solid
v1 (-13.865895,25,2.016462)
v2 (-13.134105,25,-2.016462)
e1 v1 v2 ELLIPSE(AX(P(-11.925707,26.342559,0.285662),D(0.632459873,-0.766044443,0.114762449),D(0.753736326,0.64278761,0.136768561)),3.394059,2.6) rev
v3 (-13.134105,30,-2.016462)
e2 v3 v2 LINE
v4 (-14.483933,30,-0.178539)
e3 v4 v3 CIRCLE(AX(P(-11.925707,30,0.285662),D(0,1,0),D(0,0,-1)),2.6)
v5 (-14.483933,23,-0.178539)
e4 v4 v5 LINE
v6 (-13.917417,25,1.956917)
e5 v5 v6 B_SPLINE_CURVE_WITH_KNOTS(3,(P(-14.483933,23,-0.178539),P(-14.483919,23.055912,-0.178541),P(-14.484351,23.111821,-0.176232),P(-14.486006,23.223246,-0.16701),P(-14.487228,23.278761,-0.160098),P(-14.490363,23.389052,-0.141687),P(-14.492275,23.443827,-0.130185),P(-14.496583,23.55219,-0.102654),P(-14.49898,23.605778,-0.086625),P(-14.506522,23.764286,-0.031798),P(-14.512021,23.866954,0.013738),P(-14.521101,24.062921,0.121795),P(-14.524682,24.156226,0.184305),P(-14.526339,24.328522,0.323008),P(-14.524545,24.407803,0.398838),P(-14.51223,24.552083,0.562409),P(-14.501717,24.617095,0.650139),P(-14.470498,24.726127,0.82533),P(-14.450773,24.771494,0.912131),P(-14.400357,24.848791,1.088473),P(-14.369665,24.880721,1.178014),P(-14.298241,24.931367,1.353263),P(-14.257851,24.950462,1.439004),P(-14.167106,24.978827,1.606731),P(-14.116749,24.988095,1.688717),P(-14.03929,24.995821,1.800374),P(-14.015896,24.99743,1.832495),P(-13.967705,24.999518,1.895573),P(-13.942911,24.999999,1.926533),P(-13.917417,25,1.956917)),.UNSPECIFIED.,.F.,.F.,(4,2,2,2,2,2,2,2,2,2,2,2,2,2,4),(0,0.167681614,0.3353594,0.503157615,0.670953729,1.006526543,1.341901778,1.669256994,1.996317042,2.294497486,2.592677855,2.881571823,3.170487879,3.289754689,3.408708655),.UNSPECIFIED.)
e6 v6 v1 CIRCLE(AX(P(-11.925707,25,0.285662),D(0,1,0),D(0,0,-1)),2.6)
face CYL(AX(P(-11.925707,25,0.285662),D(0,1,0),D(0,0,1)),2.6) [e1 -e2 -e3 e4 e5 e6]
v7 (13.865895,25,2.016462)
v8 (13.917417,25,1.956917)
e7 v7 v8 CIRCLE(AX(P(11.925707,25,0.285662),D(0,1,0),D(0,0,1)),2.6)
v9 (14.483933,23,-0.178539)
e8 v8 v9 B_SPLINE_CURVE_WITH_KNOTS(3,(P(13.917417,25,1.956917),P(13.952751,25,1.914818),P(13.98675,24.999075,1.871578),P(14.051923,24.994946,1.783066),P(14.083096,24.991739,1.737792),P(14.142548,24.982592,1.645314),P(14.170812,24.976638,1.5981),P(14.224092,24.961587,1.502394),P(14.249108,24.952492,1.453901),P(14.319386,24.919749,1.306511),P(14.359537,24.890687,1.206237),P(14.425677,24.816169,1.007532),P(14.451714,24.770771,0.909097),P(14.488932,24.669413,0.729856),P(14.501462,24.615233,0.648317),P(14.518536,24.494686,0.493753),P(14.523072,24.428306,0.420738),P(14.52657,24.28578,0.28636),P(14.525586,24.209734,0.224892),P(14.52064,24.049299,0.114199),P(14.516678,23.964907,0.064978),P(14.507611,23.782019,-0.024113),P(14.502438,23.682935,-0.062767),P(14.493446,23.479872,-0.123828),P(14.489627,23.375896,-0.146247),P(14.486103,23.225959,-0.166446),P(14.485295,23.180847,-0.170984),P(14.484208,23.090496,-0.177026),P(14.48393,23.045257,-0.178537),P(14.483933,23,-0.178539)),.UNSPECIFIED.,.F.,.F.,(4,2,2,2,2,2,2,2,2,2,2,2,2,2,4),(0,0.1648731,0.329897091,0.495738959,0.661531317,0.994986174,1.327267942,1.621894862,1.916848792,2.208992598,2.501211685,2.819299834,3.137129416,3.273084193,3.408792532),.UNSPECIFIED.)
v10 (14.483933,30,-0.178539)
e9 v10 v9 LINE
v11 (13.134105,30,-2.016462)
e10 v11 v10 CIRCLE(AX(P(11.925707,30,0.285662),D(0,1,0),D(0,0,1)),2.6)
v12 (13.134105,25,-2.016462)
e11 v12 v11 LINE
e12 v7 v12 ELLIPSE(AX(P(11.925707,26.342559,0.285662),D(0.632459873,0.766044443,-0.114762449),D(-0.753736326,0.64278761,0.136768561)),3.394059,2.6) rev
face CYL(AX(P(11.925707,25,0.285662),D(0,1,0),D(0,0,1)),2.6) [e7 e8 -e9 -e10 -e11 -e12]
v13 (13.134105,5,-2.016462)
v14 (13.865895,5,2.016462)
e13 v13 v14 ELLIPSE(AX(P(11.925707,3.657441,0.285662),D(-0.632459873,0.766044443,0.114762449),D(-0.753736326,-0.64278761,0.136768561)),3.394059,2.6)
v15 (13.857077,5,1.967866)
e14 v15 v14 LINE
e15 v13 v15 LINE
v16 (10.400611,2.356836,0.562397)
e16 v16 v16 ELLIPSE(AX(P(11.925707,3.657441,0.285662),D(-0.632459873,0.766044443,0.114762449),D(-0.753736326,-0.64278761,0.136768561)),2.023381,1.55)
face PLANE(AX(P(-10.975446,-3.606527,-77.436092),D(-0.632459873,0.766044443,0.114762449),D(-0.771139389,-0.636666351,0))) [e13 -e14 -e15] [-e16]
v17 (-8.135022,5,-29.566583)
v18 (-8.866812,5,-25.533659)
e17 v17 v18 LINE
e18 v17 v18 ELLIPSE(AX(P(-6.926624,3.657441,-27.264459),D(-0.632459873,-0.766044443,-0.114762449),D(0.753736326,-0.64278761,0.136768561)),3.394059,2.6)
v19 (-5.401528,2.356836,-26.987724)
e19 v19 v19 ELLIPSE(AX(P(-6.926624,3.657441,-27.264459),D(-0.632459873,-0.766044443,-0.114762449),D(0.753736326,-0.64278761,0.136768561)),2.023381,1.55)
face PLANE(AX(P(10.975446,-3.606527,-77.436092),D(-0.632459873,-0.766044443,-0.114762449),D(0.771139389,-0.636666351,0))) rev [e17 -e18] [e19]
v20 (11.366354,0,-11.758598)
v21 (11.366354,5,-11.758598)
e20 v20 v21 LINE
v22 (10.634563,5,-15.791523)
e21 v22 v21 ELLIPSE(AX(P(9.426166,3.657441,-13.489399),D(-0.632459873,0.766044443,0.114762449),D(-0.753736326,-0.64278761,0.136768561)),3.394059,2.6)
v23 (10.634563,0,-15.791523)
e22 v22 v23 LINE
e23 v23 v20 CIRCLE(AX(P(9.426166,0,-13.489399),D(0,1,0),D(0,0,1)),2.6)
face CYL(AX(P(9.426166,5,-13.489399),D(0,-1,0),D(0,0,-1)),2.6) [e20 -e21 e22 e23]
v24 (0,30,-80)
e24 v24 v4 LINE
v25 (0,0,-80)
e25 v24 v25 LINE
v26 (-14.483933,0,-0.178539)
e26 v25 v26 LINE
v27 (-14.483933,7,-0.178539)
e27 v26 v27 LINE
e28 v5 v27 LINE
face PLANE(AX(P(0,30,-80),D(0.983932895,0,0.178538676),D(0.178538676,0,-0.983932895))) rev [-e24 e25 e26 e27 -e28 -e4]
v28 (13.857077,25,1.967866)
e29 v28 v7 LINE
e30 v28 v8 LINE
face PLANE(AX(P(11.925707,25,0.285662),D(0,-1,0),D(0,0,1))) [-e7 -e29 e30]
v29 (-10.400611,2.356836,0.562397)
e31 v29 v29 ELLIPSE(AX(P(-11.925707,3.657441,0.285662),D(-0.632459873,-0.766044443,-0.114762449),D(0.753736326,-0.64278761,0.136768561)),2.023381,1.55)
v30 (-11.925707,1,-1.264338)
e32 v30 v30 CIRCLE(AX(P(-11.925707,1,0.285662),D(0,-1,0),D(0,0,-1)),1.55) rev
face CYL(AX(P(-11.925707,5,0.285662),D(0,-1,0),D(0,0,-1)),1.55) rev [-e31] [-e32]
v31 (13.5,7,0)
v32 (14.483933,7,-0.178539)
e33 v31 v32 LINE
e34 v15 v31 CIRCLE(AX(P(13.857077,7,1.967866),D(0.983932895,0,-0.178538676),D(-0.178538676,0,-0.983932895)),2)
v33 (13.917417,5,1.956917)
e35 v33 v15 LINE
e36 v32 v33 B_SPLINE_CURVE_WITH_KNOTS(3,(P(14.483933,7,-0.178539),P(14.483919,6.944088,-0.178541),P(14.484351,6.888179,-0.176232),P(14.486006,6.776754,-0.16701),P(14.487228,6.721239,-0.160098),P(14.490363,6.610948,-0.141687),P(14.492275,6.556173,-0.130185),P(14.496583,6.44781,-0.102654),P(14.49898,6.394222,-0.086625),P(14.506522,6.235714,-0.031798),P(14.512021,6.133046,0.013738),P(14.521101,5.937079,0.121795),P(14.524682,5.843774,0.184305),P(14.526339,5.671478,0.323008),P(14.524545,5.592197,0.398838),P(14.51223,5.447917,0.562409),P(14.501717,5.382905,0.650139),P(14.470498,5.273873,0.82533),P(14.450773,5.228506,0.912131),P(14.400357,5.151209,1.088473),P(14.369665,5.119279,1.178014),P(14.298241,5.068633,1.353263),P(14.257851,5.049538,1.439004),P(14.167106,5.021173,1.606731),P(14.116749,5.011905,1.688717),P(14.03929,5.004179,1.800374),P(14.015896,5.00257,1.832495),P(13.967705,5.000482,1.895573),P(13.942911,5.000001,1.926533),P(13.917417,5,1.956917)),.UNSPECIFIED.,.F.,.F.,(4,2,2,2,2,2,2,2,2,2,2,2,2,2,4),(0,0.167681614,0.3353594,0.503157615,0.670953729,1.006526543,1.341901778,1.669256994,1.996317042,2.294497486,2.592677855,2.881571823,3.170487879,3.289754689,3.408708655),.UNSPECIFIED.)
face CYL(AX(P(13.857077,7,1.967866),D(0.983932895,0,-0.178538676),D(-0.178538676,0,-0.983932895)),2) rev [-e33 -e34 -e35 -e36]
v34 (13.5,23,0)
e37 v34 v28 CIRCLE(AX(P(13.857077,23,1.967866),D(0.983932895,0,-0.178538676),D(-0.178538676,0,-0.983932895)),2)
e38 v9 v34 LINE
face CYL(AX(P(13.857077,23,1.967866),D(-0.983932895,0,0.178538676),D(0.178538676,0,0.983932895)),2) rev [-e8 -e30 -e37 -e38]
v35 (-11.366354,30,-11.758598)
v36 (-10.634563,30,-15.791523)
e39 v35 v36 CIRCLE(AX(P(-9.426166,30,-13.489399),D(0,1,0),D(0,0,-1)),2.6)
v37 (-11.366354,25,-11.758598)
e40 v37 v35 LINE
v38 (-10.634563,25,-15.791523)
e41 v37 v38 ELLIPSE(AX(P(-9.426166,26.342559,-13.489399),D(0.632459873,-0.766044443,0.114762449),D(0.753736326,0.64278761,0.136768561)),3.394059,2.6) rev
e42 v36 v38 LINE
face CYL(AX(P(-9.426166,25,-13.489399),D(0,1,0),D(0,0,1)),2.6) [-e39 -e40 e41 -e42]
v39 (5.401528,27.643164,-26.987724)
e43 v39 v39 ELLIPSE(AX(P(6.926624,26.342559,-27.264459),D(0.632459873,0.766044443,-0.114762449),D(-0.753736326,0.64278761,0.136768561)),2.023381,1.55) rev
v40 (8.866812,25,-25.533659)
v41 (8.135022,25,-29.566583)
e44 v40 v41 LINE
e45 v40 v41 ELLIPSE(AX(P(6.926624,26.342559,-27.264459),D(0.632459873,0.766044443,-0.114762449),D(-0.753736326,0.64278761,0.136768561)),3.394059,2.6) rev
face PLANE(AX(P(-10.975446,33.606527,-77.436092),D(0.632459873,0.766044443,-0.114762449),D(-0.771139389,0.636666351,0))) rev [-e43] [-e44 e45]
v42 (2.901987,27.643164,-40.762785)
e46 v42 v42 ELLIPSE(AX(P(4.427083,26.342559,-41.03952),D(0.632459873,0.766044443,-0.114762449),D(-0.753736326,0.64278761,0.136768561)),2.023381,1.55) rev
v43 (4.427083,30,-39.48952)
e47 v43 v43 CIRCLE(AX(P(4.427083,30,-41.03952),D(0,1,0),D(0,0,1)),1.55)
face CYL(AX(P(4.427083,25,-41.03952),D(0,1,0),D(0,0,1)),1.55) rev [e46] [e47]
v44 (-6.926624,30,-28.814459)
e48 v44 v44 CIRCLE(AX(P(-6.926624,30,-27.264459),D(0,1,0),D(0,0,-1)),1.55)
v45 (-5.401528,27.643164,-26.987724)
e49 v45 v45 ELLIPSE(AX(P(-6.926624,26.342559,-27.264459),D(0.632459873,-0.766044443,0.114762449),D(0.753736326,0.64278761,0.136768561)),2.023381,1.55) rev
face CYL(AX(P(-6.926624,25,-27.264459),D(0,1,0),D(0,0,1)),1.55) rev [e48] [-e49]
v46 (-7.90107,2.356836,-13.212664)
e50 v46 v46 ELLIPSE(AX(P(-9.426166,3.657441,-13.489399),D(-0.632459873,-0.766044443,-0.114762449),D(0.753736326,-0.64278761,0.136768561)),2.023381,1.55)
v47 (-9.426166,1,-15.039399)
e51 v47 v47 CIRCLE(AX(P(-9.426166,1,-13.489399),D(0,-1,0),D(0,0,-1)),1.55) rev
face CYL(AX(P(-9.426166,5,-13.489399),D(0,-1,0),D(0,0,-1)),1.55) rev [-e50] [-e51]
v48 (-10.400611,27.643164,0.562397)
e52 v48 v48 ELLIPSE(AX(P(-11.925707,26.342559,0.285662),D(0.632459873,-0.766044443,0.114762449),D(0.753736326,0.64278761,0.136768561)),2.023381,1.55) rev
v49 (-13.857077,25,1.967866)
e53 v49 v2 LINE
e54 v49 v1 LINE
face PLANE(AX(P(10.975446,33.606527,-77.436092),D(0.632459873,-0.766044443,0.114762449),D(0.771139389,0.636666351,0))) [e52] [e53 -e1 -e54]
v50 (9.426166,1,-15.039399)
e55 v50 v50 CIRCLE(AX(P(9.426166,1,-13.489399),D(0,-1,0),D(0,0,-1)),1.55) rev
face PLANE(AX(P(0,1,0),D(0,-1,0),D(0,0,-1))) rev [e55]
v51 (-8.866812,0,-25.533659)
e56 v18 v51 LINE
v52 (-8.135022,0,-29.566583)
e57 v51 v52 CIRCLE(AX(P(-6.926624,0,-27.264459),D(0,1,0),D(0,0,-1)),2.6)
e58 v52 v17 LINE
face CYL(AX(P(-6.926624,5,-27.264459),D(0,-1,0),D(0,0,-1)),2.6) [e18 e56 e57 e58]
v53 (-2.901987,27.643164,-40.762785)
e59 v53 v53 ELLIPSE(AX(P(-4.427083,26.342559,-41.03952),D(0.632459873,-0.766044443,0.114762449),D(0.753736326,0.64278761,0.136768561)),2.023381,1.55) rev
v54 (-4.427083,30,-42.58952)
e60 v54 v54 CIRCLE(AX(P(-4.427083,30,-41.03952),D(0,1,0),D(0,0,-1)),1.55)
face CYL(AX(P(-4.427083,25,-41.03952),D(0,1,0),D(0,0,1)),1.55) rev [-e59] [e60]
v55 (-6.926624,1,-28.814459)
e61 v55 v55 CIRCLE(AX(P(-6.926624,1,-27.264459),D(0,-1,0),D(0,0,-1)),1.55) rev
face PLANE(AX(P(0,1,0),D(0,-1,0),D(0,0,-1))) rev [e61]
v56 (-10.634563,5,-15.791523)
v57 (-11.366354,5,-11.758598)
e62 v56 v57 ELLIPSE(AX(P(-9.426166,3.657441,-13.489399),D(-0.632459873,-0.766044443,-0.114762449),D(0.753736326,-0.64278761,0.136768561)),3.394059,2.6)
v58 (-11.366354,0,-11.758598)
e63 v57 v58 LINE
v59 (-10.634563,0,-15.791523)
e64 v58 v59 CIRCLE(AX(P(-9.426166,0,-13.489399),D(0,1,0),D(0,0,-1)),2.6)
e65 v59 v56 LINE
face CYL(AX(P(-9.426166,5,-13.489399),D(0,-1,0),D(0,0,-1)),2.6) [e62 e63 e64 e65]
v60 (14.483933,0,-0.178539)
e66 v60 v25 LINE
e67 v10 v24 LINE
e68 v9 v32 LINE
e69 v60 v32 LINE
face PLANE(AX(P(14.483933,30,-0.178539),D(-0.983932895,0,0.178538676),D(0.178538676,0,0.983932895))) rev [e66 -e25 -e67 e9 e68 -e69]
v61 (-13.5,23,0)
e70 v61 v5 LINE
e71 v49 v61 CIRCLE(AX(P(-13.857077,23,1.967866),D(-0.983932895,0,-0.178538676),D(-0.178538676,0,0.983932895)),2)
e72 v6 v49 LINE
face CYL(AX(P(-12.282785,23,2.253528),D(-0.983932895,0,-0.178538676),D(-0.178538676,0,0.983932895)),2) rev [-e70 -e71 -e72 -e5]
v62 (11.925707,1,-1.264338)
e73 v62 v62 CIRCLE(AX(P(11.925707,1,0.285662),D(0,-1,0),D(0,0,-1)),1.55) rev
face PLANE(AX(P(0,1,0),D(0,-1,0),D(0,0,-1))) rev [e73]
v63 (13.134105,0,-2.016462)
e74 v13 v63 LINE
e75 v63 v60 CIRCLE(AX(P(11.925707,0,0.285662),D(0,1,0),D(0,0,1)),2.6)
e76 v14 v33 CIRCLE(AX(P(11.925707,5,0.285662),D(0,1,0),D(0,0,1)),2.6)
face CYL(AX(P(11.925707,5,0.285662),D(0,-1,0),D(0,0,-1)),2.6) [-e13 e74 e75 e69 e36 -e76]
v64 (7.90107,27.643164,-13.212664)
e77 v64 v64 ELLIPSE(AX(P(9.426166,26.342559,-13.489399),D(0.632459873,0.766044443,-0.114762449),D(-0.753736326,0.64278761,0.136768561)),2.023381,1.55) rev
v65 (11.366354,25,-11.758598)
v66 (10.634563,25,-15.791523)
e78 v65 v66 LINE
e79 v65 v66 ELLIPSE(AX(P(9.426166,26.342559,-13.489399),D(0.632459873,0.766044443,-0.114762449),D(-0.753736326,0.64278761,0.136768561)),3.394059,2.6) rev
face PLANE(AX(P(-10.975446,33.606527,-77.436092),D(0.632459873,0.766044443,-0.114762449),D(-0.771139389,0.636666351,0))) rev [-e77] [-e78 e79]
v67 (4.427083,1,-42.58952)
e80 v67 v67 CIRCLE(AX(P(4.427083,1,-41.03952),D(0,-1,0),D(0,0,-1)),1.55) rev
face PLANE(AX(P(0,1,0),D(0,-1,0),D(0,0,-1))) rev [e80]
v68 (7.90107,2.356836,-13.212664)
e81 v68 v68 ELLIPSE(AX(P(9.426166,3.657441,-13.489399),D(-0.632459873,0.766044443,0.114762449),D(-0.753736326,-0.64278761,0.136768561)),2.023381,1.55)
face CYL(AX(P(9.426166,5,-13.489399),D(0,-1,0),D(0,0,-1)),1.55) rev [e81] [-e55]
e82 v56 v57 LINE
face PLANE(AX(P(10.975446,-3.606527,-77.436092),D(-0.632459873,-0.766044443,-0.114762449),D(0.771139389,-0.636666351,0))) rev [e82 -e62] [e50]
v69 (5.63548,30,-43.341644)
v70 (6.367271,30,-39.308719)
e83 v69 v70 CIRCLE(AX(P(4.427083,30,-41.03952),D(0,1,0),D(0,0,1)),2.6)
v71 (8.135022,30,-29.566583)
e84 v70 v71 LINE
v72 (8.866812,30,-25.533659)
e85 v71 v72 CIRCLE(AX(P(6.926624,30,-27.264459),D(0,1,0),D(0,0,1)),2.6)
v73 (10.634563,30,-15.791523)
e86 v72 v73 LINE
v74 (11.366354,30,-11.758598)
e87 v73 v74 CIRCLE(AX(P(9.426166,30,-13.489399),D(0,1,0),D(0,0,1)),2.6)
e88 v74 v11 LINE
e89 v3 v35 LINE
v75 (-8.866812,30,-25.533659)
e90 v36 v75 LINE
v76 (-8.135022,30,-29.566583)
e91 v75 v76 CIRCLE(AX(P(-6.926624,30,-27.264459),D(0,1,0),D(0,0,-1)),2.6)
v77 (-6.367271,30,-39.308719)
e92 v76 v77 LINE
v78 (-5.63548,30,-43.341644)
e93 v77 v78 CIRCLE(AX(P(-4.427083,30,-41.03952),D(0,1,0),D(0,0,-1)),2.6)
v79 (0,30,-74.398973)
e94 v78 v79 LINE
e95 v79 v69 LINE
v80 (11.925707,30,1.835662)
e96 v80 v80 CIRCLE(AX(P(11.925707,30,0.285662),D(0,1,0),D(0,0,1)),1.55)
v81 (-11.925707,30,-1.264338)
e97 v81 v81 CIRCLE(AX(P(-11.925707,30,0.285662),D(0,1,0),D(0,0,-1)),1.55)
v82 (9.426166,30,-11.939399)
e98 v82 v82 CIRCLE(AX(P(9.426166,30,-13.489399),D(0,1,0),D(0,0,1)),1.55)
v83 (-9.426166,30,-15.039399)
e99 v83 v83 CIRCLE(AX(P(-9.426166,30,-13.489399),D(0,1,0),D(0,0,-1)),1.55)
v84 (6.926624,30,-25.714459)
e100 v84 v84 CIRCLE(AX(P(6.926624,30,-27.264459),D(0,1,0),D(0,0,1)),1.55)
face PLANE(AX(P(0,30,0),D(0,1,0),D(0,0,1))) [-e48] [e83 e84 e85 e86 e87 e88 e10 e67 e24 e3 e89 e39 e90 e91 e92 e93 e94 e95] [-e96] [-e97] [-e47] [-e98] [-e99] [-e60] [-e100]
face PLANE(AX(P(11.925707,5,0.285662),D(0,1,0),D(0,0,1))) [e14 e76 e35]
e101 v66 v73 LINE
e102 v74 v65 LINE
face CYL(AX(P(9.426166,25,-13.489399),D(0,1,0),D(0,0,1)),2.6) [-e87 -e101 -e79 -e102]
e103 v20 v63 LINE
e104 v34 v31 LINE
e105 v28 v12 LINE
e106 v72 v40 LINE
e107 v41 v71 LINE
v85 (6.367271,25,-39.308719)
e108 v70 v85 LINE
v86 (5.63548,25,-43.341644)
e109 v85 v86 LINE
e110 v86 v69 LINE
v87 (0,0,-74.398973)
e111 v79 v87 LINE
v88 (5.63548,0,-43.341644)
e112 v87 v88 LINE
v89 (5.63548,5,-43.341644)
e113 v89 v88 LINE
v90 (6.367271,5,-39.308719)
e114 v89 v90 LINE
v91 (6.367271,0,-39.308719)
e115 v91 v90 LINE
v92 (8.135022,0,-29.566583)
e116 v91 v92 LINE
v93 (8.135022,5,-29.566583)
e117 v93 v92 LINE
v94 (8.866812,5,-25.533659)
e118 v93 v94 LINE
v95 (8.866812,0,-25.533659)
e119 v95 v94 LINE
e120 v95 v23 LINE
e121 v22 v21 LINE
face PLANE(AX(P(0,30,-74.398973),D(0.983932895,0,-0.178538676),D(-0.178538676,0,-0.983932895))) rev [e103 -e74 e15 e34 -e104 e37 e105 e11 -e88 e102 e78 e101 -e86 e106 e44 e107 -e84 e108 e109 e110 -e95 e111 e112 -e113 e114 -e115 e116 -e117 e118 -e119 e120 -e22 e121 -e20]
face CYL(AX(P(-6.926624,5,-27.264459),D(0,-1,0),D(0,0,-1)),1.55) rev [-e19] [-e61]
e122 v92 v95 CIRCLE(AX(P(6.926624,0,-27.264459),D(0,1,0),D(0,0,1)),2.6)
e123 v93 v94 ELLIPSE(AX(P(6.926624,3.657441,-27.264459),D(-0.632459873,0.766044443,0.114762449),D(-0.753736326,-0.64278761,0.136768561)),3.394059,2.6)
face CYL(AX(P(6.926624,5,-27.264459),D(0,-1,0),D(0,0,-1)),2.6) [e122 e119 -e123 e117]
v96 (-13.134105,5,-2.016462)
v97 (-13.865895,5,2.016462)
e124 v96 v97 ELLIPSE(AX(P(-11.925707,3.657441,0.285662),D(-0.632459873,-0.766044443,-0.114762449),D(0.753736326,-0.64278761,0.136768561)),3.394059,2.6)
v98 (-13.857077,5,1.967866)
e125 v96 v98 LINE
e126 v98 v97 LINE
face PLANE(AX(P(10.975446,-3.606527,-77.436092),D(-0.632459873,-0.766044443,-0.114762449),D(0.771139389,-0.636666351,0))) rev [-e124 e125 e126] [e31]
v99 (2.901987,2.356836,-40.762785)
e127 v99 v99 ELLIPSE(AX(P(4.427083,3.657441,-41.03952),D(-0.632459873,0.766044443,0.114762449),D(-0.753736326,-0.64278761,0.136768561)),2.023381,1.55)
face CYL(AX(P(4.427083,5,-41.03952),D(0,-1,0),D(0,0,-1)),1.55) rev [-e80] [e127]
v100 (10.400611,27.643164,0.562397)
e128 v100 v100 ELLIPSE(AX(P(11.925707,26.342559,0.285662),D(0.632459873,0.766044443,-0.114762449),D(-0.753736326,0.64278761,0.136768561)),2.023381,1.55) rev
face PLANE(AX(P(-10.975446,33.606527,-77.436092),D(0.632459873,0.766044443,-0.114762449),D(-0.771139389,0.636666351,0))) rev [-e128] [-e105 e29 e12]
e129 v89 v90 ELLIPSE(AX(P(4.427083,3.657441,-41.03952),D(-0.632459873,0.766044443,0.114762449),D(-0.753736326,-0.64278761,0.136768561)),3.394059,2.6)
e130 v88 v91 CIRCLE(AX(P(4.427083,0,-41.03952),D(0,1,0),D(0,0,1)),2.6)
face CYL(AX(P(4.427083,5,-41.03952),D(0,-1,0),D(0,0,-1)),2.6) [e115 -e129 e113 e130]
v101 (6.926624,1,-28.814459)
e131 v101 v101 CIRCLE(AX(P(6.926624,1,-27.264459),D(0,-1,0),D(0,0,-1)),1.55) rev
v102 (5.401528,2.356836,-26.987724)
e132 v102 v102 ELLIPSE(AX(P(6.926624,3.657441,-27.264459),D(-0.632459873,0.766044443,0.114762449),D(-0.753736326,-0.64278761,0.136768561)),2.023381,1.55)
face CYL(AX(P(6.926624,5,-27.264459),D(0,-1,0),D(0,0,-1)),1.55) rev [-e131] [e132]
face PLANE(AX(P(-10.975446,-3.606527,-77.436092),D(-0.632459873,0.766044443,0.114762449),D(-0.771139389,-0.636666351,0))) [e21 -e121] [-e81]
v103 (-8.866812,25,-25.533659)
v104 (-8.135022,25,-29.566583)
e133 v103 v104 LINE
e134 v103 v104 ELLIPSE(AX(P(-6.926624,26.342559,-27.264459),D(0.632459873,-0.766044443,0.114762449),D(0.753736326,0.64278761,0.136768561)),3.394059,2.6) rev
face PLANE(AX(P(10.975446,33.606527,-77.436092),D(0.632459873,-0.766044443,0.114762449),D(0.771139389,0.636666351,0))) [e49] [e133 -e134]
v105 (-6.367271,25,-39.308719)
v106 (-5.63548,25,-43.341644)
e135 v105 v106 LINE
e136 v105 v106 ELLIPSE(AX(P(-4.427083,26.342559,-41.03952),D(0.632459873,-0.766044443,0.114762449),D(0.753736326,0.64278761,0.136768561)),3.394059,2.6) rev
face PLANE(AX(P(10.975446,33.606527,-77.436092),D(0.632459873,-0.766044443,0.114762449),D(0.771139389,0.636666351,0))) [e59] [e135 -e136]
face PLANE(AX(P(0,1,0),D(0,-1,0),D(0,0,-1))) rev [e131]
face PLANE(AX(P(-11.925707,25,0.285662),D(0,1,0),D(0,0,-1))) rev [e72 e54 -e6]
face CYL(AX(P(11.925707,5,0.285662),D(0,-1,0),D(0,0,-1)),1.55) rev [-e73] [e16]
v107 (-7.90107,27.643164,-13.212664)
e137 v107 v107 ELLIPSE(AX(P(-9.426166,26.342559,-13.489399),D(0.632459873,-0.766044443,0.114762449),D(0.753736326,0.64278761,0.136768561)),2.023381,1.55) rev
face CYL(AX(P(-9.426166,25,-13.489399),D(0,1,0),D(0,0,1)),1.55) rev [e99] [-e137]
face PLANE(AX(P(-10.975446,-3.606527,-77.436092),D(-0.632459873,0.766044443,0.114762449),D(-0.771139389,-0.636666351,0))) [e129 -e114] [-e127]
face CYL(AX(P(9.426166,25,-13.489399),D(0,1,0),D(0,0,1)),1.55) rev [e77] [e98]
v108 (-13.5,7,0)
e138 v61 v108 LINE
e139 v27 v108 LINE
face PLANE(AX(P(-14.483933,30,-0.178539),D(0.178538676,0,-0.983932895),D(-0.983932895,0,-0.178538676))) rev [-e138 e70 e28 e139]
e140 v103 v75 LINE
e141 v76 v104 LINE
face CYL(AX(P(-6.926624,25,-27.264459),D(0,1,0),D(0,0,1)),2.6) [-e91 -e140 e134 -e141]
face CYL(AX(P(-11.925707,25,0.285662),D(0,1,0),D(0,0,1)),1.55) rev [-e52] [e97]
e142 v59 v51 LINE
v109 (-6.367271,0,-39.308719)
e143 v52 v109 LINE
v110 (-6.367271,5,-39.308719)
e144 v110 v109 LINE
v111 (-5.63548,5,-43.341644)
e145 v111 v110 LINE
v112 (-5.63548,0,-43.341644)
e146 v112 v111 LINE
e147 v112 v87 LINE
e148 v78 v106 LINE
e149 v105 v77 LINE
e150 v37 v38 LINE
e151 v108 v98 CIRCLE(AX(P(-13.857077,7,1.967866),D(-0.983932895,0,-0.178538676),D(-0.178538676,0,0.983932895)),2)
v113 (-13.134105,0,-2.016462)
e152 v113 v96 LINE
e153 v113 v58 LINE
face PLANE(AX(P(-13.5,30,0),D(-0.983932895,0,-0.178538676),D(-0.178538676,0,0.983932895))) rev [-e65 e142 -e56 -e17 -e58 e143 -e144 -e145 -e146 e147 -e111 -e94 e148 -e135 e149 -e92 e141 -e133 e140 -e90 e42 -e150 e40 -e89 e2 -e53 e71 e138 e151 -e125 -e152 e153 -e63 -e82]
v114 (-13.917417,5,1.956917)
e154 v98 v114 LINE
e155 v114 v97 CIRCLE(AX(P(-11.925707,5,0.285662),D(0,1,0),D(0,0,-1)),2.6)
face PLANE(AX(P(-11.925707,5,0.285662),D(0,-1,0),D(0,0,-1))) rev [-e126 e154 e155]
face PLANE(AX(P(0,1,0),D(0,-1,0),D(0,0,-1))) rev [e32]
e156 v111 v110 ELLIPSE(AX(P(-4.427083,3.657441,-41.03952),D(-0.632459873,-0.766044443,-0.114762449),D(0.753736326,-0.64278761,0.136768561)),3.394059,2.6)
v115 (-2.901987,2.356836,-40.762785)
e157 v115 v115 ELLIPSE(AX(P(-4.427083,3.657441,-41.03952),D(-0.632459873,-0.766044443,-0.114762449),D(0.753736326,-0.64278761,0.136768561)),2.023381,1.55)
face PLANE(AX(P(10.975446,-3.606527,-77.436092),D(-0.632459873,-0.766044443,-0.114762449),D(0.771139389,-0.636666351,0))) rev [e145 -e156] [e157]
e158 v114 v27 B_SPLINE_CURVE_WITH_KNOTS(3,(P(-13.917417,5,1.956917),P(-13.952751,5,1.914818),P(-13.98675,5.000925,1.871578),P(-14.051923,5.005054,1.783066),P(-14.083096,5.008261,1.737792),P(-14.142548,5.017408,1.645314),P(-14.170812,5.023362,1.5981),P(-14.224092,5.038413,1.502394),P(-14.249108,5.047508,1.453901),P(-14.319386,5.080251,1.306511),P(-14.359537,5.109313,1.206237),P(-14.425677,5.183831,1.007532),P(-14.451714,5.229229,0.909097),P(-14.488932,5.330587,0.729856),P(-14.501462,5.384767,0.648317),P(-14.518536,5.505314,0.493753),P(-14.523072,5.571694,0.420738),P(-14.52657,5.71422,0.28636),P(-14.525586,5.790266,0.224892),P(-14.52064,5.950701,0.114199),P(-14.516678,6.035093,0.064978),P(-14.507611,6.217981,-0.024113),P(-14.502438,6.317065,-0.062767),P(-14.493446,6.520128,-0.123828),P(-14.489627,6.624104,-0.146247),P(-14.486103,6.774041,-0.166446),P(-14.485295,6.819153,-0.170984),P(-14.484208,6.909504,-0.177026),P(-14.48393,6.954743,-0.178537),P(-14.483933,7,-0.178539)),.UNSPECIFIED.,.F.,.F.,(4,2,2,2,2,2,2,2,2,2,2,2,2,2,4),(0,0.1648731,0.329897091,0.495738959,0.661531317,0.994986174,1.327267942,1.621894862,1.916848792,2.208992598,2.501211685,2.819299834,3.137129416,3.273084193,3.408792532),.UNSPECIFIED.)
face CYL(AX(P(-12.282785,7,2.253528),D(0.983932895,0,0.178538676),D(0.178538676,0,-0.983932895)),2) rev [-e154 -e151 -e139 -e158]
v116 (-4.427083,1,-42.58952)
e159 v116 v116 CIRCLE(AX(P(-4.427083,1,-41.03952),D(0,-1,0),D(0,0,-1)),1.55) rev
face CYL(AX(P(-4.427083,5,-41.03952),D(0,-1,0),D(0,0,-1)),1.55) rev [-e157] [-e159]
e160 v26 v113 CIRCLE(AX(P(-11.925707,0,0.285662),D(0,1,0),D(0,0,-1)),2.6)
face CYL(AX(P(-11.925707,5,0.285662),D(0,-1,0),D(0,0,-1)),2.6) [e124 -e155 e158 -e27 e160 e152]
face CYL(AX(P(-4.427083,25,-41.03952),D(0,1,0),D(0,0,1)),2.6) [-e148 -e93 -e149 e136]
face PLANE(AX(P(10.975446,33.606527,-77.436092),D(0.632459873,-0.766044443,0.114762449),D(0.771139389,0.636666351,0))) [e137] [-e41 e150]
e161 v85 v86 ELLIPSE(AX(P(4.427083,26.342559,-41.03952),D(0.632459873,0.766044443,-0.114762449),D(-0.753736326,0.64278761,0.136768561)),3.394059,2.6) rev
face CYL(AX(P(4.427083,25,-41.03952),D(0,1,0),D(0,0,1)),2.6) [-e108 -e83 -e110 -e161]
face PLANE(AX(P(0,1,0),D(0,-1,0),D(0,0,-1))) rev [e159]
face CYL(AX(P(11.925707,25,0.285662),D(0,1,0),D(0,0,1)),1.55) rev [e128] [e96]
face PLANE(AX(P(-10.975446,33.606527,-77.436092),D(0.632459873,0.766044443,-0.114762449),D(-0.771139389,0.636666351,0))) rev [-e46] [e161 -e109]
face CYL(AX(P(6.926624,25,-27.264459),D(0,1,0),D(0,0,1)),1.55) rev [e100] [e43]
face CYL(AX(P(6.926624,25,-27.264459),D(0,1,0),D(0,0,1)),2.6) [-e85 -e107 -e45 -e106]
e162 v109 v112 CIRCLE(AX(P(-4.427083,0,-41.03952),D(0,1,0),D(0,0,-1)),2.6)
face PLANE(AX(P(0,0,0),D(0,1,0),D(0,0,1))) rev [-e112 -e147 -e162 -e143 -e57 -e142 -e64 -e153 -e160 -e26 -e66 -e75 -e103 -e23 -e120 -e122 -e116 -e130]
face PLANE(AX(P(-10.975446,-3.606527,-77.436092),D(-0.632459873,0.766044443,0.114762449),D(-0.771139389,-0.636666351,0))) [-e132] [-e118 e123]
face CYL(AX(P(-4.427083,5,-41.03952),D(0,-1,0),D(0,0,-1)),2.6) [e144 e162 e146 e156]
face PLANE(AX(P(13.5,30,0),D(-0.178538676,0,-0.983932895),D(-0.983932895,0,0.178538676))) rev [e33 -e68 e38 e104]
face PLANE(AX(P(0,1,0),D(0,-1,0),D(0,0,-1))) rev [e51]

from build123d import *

# Parameters (mm, degrees)
BOSS_EXTRUDE1_DEPTH            = 30
SKETCH2_R                      = 2.6
SKETCH2_R_2                    = 1.55
BOSS_EXTRUDE3_DEPTH            = 5
CUT_EXTRUDE1_REACH             = 90.931
CUT_EXTRUDE1_DIRECTION_2_DEPTH = 89.931178746
CUT_EXTRUDE2_REACH             = 90.931
CUT_EXTRUDE2_DIRECTION_2_DEPTH = 89.931178746
FILLET1_R                      = 2
SKETCH6_R                      = 2.6
BOSS_EXTRUDE4_DEPTH            = 1


with BuildPart() as part:
    # Sketch1 → Boss-Extrude1 (new body)
    with BuildSketch(Plane(origin=(0, 0, 0), x_dir=(1, 0, 0), z_dir=(0, 1, 0))):
        Polygon((-13.5, 0), (0, 74.39897269), (13.5, 0), (14.483932895, 0.178538676), (0, 80), (-14.483932895, 0.178538676), align=None)
    extrude(amount=BOSS_EXTRUDE1_DEPTH)

    # Sketch2 → Boss-Extrude3 (add)
    # profile 1 of 8: a face of its own
    with BuildSketch(Plane(origin=(0, 0, 0), x_dir=(1, 0, 0), z_dir=(0, 1, 0))):
        with Locations((11.925707369, -0.285661882)):
            Circle(SKETCH2_R)
        with Locations(Location((11.925707369, -0.285661882, 0), (0, 0, 270))):
            Circle(SKETCH2_R_2, mode=Mode.SUBTRACT)
    # profile 2 of 8: a face of its own
    with BuildSketch(Plane(origin=(0, 0, 0), x_dir=(1, 0, 0), z_dir=(0, 1, 0))):
        with Locations((9.426165905, 13.489398644)):
            Circle(SKETCH2_R)
        with Locations(Location((9.426165905, 13.489398644, 0), (0, 0, 270))):
            Circle(SKETCH2_R_2, mode=Mode.SUBTRACT)
    # profile 3 of 8: a face of its own
    with BuildSketch(Plane(origin=(0, 0, 0), x_dir=(1, 0, 0), z_dir=(0, 1, 0))):
        with Locations((6.926624441, 27.264459169)):
            Circle(SKETCH2_R)
        with Locations(Location((6.926624441, 27.264459169, 0), (0, 0, 270))):
            Circle(SKETCH2_R_2, mode=Mode.SUBTRACT)
    # profile 4 of 8: a face of its own
    with BuildSketch(Plane(origin=(0, 0, 0), x_dir=(1, 0, 0), z_dir=(0, 1, 0))):
        with Locations((4.427082978, 41.039519694)):
            Circle(SKETCH2_R)
        with Locations(Location((4.427082978, 41.039519694, 0), (0, 0, 270))):
            Circle(SKETCH2_R_2, mode=Mode.SUBTRACT)
    # profile 5 of 8: a face of its own
    with BuildSketch(Plane(origin=(0, 0, 0), x_dir=(1, 0, 0), z_dir=(0, 1, 0))):
        with Locations((-11.925707369, -0.285661882)):
            Circle(SKETCH2_R)
        with Locations(Location((-11.925707369, -0.285661882, 0), (0, 0, 90))):
            Circle(SKETCH2_R_2, mode=Mode.SUBTRACT)
    # profile 6 of 8: a face of its own
    with BuildSketch(Plane(origin=(0, 0, 0), x_dir=(1, 0, 0), z_dir=(0, 1, 0))):
        with Locations((-9.426165905, 13.489398644)):
            Circle(SKETCH2_R)
        with Locations(Location((-9.426165905, 13.489398644, 0), (0, 0, 90))):
            Circle(SKETCH2_R_2, mode=Mode.SUBTRACT)
    # profile 7 of 8: a face of its own
    with BuildSketch(Plane(origin=(0, 0, 0), x_dir=(1, 0, 0), z_dir=(0, 1, 0))):
        with Locations((-6.926624441, 27.264459169)):
            Circle(SKETCH2_R)
        with Locations(Location((-6.926624441, 27.264459169, 0), (0, 0, 90))):
            Circle(SKETCH2_R_2, mode=Mode.SUBTRACT)
    # profile 8 of 8: a face of its own
    with BuildSketch(Plane(origin=(0, 0, 0), x_dir=(1, 0, 0), z_dir=(0, 1, 0))):
        with Locations((-4.427082978, 41.039519694)):
            Circle(SKETCH2_R)
        with Locations(Location((-4.427082978, 41.039519694, 0), (0, 0, 90))):
            Circle(SKETCH2_R_2, mode=Mode.SUBTRACT)
    boss_extrude3 = extrude(amount=BOSS_EXTRUDE3_DEPTH)

    # Cut-Extrude1: up to this face of the body (flat: up to its plane)
    cut_extrude1_end = Plane(part.part.faces().sort_by_distance((-6.670361164, 15.408163761, -37.638378758))[0])
    # Sketch4 → Cut-Extrude1 (cut, up to the picked face)
    with BuildSketch(Plane(origin=(0.430326794, 0, 2.371546029), x_dir=(0.9839328946538309, 0, -0.17853867597283662), z_dir=(0.17853867597283662, 0, 0.9839328946538309)), mode=Mode.PRIVATE) as cut_extrude1_sk1:
        Polygon((13.283094078, 5), (9.083094078, 5), (9.083094078, 1.475781549), align=None)
    cut_extrude1_tool1 = split(extrude(cut_extrude1_sk1.sketch, amount=-CUT_EXTRUDE1_REACH, mode=Mode.PRIVATE), bisect_by=cut_extrude1_end, keep=Keep.BOTH, mode=Mode.PRIVATE)
    cut_extrude1 = cut_extrude1_tool1.solids().sort_by(Axis((10.744988, 3.825261, 0.499908), (-0.17853867597283662, 0, -0.9839328946538309)))[0]
    add(cut_extrude1, mode=Mode.SUBTRACT)

    # Sketch4 → Cut-Extrude1 direction 2 (cut)
    with BuildSketch(Plane(origin=(0.430326794, 0, 2.371546029), x_dir=(0.9839328946538309, 0, -0.17853867597283662), z_dir=(0.17853867597283662, 0, 0.9839328946538309))):
        Polygon((13.283094078, 5), (9.083094078, 5), (9.083094078, 1.475781549), align=None)
    cut_extrude1_direction_2 = extrude(amount=CUT_EXTRUDE1_DIRECTION_2_DEPTH, mode=Mode.SUBTRACT)

    # Cut-Extrude2: up to this face of the body (flat: up to its plane)
    cut_extrude2_end = Plane(part.part.faces().sort_by_distance((6.670361164, 15.408163761, -37.638378758))[0])
    # Sketch5 → Cut-Extrude2 (cut, up to the picked face)
    with BuildSketch(Plane(origin=(-0.430326794, 0, 2.371546029), x_dir=(0.9839328946538308, 0, 0.17853867597283732), z_dir=(-0.17853867597283732, 0, 0.9839328946538308)), mode=Mode.PRIVATE) as cut_extrude2_sk1:
        Polygon((-9.083094078, 5), (-9.083094078, 1.475781549), (-13.283094078, 5), align=None)
    cut_extrude2_tool1 = split(extrude(cut_extrude2_sk1.sketch, amount=-CUT_EXTRUDE2_REACH, mode=Mode.PRIVATE), bisect_by=cut_extrude2_end, keep=Keep.BOTH, mode=Mode.PRIVATE)
    cut_extrude2 = cut_extrude2_tool1.solids().sort_by(Axis((-10.744988, 3.825261, 0.499908), (0.17853867597283732, 0, -0.9839328946538308)))[0]
    add(cut_extrude2, mode=Mode.SUBTRACT)

    # Sketch5 → Cut-Extrude2 direction 2 (cut)
    with BuildSketch(Plane(origin=(-0.430326794, 0, 2.371546029), x_dir=(0.9839328946538308, 0, 0.17853867597283732), z_dir=(-0.17853867597283732, 0, 0.9839328946538308))):
        Polygon((-9.083094078, 5), (-9.083094078, 1.475781549), (-13.283094078, 5), align=None)
    cut_extrude2_direction_2 = extrude(amount=CUT_EXTRUDE2_DIRECTION_2_DEPTH, mode=Mode.SUBTRACT)

    # Mirror2: Boss-Extrude3, Cut-Extrude1, Cut-Extrude1 direction 2, Cut-Extrude2, Cut-Extrude2 direction 2 across plane
    add(boss_extrude3.mirror(Plane.ZX.offset(15)))
    add(cut_extrude1.mirror(Plane.ZX.offset(15)), mode=Mode.SUBTRACT)
    add(cut_extrude1_direction_2.mirror(Plane.ZX.offset(15)), mode=Mode.SUBTRACT)
    add(cut_extrude2.mirror(Plane.ZX.offset(15)), mode=Mode.SUBTRACT)
    add(cut_extrude2_direction_2.mirror(Plane.ZX.offset(15)), mode=Mode.SUBTRACT)

    # Fillet1
    # the kernel refuses this fillet: 2 mm, written as the material it adds along each edge
    with BuildSketch(Plane(origin=(13.5, 5, 0), x_dir=(0, 1, 0), z_dir=(0.9839328946538308, 0, -0.17853867597283668))) as fillet1_piece_1_section:
        with BuildLine():
            CenterArc((FILLET1_R, FILLET1_R), FILLET1_R, 180, 90)
            Line((0, FILLET1_R), (0, 0))
            Line((0, 0), (FILLET1_R, 0))
        make_face()
    fillet1_piece_1 = extrude(amount=6, mode=Mode.PRIVATE)
    fillet1_piece_1 = fillet1_piece_1 & Plane(origin=(11.925707369, 5.699977742, 0.285661882), x_dir=(1, 0, 0), z_dir=(0, -1, 0)) * Cylinder(2.6, 20, mode=Mode.PRIVATE)
    add(fillet1_piece_1)
    with BuildSketch(Plane(origin=(13.5, 25, 0), x_dir=(0, -1, 0), z_dir=(0.9839328946538308, 0, -0.17853867597283668))) as fillet1_piece_2_section:
        with BuildLine():
            CenterArc((FILLET1_R, -FILLET1_R), FILLET1_R, 90, 90)
            Line((0, -FILLET1_R), (0, 0))
            Line((0, 0), (FILLET1_R, 0))
        make_face()
    fillet1_piece_2 = extrude(amount=6, mode=Mode.PRIVATE)
    fillet1_piece_2 = fillet1_piece_2 & Plane(origin=(11.925707369, 24.300022258, 0.285661882), x_dir=(1, 0, 0), z_dir=(0, 1, 0)) * Cylinder(2.6, 20, mode=Mode.PRIVATE)
    add(fillet1_piece_2)
    with BuildSketch(Plane(origin=(-19.403597368, 25, -1.071232056), x_dir=(0, -1, 0), z_dir=(0.9839328946538307, 0, 0.17853867597283735))) as fillet1_piece_3_section:
        with BuildLine():
            CenterArc((FILLET1_R, -FILLET1_R), FILLET1_R, 90, 90)
            Line((0, -FILLET1_R), (0, 0))
            Line((0, 0), (FILLET1_R, 0))
        make_face()
    fillet1_piece_3 = extrude(amount=6, mode=Mode.PRIVATE)
    fillet1_piece_3 = fillet1_piece_3 & Plane(origin=(-11.925707369, 24.777637105, 0.285661882), x_dir=(1, 0, 0), z_dir=(0, 1, 0)) * Cylinder(2.6, 21, mode=Mode.PRIVATE)
    add(fillet1_piece_3)
    with BuildSketch(Plane(origin=(-19.403597368, 5, -1.071232056), x_dir=(-0.17853867597283735, 0, 0.9839328946538307), z_dir=(0.9839328946538307, 0, 0.17853867597283735))) as fillet1_piece_4_section:
        with BuildLine():
            CenterArc((FILLET1_R, -FILLET1_R), FILLET1_R, 90, 90)
            Line((0, -FILLET1_R), (0, 0))
            Line((0, 0), (FILLET1_R, 0))
        make_face()
    fillet1_piece_4 = extrude(amount=6, mode=Mode.PRIVATE)
    fillet1_piece_4 = fillet1_piece_4 & Plane(origin=(-11.925707369, 5.222362792, 0.285661882), x_dir=(1, 0, 0), z_dir=(0, -1, 0)) * Cylinder(2.6, 21, mode=Mode.PRIVATE)
    add(fillet1_piece_4)

    # Sketch6 → Boss-Extrude4 (add)
    with BuildSketch(Plane.XZ):
        with Locations((4.427082978, -41.039519694)):
            Circle(SKETCH6_R)
        with Locations((-4.427082978, -41.039519694)):
            Circle(SKETCH6_R)
        with Locations((-6.926624441, -27.264459169)):
            Circle(SKETCH6_R)
        with Locations((11.925707369, 0.285661882)):
            Circle(SKETCH6_R)
        with Locations((6.926624441, -27.264459169)):
            Circle(SKETCH6_R)
        with Locations((9.426165905, -13.489398644)):
            Circle(SKETCH6_R)
        with Locations((-9.426165905, -13.489398644)):
            Circle(SKETCH6_R)
        with Locations((-11.925707369, 0.285661882)):
            Circle(SKETCH6_R)
    extrude(amount=-BOSS_EXTRUDE4_DEPTH)


solid = part.part
